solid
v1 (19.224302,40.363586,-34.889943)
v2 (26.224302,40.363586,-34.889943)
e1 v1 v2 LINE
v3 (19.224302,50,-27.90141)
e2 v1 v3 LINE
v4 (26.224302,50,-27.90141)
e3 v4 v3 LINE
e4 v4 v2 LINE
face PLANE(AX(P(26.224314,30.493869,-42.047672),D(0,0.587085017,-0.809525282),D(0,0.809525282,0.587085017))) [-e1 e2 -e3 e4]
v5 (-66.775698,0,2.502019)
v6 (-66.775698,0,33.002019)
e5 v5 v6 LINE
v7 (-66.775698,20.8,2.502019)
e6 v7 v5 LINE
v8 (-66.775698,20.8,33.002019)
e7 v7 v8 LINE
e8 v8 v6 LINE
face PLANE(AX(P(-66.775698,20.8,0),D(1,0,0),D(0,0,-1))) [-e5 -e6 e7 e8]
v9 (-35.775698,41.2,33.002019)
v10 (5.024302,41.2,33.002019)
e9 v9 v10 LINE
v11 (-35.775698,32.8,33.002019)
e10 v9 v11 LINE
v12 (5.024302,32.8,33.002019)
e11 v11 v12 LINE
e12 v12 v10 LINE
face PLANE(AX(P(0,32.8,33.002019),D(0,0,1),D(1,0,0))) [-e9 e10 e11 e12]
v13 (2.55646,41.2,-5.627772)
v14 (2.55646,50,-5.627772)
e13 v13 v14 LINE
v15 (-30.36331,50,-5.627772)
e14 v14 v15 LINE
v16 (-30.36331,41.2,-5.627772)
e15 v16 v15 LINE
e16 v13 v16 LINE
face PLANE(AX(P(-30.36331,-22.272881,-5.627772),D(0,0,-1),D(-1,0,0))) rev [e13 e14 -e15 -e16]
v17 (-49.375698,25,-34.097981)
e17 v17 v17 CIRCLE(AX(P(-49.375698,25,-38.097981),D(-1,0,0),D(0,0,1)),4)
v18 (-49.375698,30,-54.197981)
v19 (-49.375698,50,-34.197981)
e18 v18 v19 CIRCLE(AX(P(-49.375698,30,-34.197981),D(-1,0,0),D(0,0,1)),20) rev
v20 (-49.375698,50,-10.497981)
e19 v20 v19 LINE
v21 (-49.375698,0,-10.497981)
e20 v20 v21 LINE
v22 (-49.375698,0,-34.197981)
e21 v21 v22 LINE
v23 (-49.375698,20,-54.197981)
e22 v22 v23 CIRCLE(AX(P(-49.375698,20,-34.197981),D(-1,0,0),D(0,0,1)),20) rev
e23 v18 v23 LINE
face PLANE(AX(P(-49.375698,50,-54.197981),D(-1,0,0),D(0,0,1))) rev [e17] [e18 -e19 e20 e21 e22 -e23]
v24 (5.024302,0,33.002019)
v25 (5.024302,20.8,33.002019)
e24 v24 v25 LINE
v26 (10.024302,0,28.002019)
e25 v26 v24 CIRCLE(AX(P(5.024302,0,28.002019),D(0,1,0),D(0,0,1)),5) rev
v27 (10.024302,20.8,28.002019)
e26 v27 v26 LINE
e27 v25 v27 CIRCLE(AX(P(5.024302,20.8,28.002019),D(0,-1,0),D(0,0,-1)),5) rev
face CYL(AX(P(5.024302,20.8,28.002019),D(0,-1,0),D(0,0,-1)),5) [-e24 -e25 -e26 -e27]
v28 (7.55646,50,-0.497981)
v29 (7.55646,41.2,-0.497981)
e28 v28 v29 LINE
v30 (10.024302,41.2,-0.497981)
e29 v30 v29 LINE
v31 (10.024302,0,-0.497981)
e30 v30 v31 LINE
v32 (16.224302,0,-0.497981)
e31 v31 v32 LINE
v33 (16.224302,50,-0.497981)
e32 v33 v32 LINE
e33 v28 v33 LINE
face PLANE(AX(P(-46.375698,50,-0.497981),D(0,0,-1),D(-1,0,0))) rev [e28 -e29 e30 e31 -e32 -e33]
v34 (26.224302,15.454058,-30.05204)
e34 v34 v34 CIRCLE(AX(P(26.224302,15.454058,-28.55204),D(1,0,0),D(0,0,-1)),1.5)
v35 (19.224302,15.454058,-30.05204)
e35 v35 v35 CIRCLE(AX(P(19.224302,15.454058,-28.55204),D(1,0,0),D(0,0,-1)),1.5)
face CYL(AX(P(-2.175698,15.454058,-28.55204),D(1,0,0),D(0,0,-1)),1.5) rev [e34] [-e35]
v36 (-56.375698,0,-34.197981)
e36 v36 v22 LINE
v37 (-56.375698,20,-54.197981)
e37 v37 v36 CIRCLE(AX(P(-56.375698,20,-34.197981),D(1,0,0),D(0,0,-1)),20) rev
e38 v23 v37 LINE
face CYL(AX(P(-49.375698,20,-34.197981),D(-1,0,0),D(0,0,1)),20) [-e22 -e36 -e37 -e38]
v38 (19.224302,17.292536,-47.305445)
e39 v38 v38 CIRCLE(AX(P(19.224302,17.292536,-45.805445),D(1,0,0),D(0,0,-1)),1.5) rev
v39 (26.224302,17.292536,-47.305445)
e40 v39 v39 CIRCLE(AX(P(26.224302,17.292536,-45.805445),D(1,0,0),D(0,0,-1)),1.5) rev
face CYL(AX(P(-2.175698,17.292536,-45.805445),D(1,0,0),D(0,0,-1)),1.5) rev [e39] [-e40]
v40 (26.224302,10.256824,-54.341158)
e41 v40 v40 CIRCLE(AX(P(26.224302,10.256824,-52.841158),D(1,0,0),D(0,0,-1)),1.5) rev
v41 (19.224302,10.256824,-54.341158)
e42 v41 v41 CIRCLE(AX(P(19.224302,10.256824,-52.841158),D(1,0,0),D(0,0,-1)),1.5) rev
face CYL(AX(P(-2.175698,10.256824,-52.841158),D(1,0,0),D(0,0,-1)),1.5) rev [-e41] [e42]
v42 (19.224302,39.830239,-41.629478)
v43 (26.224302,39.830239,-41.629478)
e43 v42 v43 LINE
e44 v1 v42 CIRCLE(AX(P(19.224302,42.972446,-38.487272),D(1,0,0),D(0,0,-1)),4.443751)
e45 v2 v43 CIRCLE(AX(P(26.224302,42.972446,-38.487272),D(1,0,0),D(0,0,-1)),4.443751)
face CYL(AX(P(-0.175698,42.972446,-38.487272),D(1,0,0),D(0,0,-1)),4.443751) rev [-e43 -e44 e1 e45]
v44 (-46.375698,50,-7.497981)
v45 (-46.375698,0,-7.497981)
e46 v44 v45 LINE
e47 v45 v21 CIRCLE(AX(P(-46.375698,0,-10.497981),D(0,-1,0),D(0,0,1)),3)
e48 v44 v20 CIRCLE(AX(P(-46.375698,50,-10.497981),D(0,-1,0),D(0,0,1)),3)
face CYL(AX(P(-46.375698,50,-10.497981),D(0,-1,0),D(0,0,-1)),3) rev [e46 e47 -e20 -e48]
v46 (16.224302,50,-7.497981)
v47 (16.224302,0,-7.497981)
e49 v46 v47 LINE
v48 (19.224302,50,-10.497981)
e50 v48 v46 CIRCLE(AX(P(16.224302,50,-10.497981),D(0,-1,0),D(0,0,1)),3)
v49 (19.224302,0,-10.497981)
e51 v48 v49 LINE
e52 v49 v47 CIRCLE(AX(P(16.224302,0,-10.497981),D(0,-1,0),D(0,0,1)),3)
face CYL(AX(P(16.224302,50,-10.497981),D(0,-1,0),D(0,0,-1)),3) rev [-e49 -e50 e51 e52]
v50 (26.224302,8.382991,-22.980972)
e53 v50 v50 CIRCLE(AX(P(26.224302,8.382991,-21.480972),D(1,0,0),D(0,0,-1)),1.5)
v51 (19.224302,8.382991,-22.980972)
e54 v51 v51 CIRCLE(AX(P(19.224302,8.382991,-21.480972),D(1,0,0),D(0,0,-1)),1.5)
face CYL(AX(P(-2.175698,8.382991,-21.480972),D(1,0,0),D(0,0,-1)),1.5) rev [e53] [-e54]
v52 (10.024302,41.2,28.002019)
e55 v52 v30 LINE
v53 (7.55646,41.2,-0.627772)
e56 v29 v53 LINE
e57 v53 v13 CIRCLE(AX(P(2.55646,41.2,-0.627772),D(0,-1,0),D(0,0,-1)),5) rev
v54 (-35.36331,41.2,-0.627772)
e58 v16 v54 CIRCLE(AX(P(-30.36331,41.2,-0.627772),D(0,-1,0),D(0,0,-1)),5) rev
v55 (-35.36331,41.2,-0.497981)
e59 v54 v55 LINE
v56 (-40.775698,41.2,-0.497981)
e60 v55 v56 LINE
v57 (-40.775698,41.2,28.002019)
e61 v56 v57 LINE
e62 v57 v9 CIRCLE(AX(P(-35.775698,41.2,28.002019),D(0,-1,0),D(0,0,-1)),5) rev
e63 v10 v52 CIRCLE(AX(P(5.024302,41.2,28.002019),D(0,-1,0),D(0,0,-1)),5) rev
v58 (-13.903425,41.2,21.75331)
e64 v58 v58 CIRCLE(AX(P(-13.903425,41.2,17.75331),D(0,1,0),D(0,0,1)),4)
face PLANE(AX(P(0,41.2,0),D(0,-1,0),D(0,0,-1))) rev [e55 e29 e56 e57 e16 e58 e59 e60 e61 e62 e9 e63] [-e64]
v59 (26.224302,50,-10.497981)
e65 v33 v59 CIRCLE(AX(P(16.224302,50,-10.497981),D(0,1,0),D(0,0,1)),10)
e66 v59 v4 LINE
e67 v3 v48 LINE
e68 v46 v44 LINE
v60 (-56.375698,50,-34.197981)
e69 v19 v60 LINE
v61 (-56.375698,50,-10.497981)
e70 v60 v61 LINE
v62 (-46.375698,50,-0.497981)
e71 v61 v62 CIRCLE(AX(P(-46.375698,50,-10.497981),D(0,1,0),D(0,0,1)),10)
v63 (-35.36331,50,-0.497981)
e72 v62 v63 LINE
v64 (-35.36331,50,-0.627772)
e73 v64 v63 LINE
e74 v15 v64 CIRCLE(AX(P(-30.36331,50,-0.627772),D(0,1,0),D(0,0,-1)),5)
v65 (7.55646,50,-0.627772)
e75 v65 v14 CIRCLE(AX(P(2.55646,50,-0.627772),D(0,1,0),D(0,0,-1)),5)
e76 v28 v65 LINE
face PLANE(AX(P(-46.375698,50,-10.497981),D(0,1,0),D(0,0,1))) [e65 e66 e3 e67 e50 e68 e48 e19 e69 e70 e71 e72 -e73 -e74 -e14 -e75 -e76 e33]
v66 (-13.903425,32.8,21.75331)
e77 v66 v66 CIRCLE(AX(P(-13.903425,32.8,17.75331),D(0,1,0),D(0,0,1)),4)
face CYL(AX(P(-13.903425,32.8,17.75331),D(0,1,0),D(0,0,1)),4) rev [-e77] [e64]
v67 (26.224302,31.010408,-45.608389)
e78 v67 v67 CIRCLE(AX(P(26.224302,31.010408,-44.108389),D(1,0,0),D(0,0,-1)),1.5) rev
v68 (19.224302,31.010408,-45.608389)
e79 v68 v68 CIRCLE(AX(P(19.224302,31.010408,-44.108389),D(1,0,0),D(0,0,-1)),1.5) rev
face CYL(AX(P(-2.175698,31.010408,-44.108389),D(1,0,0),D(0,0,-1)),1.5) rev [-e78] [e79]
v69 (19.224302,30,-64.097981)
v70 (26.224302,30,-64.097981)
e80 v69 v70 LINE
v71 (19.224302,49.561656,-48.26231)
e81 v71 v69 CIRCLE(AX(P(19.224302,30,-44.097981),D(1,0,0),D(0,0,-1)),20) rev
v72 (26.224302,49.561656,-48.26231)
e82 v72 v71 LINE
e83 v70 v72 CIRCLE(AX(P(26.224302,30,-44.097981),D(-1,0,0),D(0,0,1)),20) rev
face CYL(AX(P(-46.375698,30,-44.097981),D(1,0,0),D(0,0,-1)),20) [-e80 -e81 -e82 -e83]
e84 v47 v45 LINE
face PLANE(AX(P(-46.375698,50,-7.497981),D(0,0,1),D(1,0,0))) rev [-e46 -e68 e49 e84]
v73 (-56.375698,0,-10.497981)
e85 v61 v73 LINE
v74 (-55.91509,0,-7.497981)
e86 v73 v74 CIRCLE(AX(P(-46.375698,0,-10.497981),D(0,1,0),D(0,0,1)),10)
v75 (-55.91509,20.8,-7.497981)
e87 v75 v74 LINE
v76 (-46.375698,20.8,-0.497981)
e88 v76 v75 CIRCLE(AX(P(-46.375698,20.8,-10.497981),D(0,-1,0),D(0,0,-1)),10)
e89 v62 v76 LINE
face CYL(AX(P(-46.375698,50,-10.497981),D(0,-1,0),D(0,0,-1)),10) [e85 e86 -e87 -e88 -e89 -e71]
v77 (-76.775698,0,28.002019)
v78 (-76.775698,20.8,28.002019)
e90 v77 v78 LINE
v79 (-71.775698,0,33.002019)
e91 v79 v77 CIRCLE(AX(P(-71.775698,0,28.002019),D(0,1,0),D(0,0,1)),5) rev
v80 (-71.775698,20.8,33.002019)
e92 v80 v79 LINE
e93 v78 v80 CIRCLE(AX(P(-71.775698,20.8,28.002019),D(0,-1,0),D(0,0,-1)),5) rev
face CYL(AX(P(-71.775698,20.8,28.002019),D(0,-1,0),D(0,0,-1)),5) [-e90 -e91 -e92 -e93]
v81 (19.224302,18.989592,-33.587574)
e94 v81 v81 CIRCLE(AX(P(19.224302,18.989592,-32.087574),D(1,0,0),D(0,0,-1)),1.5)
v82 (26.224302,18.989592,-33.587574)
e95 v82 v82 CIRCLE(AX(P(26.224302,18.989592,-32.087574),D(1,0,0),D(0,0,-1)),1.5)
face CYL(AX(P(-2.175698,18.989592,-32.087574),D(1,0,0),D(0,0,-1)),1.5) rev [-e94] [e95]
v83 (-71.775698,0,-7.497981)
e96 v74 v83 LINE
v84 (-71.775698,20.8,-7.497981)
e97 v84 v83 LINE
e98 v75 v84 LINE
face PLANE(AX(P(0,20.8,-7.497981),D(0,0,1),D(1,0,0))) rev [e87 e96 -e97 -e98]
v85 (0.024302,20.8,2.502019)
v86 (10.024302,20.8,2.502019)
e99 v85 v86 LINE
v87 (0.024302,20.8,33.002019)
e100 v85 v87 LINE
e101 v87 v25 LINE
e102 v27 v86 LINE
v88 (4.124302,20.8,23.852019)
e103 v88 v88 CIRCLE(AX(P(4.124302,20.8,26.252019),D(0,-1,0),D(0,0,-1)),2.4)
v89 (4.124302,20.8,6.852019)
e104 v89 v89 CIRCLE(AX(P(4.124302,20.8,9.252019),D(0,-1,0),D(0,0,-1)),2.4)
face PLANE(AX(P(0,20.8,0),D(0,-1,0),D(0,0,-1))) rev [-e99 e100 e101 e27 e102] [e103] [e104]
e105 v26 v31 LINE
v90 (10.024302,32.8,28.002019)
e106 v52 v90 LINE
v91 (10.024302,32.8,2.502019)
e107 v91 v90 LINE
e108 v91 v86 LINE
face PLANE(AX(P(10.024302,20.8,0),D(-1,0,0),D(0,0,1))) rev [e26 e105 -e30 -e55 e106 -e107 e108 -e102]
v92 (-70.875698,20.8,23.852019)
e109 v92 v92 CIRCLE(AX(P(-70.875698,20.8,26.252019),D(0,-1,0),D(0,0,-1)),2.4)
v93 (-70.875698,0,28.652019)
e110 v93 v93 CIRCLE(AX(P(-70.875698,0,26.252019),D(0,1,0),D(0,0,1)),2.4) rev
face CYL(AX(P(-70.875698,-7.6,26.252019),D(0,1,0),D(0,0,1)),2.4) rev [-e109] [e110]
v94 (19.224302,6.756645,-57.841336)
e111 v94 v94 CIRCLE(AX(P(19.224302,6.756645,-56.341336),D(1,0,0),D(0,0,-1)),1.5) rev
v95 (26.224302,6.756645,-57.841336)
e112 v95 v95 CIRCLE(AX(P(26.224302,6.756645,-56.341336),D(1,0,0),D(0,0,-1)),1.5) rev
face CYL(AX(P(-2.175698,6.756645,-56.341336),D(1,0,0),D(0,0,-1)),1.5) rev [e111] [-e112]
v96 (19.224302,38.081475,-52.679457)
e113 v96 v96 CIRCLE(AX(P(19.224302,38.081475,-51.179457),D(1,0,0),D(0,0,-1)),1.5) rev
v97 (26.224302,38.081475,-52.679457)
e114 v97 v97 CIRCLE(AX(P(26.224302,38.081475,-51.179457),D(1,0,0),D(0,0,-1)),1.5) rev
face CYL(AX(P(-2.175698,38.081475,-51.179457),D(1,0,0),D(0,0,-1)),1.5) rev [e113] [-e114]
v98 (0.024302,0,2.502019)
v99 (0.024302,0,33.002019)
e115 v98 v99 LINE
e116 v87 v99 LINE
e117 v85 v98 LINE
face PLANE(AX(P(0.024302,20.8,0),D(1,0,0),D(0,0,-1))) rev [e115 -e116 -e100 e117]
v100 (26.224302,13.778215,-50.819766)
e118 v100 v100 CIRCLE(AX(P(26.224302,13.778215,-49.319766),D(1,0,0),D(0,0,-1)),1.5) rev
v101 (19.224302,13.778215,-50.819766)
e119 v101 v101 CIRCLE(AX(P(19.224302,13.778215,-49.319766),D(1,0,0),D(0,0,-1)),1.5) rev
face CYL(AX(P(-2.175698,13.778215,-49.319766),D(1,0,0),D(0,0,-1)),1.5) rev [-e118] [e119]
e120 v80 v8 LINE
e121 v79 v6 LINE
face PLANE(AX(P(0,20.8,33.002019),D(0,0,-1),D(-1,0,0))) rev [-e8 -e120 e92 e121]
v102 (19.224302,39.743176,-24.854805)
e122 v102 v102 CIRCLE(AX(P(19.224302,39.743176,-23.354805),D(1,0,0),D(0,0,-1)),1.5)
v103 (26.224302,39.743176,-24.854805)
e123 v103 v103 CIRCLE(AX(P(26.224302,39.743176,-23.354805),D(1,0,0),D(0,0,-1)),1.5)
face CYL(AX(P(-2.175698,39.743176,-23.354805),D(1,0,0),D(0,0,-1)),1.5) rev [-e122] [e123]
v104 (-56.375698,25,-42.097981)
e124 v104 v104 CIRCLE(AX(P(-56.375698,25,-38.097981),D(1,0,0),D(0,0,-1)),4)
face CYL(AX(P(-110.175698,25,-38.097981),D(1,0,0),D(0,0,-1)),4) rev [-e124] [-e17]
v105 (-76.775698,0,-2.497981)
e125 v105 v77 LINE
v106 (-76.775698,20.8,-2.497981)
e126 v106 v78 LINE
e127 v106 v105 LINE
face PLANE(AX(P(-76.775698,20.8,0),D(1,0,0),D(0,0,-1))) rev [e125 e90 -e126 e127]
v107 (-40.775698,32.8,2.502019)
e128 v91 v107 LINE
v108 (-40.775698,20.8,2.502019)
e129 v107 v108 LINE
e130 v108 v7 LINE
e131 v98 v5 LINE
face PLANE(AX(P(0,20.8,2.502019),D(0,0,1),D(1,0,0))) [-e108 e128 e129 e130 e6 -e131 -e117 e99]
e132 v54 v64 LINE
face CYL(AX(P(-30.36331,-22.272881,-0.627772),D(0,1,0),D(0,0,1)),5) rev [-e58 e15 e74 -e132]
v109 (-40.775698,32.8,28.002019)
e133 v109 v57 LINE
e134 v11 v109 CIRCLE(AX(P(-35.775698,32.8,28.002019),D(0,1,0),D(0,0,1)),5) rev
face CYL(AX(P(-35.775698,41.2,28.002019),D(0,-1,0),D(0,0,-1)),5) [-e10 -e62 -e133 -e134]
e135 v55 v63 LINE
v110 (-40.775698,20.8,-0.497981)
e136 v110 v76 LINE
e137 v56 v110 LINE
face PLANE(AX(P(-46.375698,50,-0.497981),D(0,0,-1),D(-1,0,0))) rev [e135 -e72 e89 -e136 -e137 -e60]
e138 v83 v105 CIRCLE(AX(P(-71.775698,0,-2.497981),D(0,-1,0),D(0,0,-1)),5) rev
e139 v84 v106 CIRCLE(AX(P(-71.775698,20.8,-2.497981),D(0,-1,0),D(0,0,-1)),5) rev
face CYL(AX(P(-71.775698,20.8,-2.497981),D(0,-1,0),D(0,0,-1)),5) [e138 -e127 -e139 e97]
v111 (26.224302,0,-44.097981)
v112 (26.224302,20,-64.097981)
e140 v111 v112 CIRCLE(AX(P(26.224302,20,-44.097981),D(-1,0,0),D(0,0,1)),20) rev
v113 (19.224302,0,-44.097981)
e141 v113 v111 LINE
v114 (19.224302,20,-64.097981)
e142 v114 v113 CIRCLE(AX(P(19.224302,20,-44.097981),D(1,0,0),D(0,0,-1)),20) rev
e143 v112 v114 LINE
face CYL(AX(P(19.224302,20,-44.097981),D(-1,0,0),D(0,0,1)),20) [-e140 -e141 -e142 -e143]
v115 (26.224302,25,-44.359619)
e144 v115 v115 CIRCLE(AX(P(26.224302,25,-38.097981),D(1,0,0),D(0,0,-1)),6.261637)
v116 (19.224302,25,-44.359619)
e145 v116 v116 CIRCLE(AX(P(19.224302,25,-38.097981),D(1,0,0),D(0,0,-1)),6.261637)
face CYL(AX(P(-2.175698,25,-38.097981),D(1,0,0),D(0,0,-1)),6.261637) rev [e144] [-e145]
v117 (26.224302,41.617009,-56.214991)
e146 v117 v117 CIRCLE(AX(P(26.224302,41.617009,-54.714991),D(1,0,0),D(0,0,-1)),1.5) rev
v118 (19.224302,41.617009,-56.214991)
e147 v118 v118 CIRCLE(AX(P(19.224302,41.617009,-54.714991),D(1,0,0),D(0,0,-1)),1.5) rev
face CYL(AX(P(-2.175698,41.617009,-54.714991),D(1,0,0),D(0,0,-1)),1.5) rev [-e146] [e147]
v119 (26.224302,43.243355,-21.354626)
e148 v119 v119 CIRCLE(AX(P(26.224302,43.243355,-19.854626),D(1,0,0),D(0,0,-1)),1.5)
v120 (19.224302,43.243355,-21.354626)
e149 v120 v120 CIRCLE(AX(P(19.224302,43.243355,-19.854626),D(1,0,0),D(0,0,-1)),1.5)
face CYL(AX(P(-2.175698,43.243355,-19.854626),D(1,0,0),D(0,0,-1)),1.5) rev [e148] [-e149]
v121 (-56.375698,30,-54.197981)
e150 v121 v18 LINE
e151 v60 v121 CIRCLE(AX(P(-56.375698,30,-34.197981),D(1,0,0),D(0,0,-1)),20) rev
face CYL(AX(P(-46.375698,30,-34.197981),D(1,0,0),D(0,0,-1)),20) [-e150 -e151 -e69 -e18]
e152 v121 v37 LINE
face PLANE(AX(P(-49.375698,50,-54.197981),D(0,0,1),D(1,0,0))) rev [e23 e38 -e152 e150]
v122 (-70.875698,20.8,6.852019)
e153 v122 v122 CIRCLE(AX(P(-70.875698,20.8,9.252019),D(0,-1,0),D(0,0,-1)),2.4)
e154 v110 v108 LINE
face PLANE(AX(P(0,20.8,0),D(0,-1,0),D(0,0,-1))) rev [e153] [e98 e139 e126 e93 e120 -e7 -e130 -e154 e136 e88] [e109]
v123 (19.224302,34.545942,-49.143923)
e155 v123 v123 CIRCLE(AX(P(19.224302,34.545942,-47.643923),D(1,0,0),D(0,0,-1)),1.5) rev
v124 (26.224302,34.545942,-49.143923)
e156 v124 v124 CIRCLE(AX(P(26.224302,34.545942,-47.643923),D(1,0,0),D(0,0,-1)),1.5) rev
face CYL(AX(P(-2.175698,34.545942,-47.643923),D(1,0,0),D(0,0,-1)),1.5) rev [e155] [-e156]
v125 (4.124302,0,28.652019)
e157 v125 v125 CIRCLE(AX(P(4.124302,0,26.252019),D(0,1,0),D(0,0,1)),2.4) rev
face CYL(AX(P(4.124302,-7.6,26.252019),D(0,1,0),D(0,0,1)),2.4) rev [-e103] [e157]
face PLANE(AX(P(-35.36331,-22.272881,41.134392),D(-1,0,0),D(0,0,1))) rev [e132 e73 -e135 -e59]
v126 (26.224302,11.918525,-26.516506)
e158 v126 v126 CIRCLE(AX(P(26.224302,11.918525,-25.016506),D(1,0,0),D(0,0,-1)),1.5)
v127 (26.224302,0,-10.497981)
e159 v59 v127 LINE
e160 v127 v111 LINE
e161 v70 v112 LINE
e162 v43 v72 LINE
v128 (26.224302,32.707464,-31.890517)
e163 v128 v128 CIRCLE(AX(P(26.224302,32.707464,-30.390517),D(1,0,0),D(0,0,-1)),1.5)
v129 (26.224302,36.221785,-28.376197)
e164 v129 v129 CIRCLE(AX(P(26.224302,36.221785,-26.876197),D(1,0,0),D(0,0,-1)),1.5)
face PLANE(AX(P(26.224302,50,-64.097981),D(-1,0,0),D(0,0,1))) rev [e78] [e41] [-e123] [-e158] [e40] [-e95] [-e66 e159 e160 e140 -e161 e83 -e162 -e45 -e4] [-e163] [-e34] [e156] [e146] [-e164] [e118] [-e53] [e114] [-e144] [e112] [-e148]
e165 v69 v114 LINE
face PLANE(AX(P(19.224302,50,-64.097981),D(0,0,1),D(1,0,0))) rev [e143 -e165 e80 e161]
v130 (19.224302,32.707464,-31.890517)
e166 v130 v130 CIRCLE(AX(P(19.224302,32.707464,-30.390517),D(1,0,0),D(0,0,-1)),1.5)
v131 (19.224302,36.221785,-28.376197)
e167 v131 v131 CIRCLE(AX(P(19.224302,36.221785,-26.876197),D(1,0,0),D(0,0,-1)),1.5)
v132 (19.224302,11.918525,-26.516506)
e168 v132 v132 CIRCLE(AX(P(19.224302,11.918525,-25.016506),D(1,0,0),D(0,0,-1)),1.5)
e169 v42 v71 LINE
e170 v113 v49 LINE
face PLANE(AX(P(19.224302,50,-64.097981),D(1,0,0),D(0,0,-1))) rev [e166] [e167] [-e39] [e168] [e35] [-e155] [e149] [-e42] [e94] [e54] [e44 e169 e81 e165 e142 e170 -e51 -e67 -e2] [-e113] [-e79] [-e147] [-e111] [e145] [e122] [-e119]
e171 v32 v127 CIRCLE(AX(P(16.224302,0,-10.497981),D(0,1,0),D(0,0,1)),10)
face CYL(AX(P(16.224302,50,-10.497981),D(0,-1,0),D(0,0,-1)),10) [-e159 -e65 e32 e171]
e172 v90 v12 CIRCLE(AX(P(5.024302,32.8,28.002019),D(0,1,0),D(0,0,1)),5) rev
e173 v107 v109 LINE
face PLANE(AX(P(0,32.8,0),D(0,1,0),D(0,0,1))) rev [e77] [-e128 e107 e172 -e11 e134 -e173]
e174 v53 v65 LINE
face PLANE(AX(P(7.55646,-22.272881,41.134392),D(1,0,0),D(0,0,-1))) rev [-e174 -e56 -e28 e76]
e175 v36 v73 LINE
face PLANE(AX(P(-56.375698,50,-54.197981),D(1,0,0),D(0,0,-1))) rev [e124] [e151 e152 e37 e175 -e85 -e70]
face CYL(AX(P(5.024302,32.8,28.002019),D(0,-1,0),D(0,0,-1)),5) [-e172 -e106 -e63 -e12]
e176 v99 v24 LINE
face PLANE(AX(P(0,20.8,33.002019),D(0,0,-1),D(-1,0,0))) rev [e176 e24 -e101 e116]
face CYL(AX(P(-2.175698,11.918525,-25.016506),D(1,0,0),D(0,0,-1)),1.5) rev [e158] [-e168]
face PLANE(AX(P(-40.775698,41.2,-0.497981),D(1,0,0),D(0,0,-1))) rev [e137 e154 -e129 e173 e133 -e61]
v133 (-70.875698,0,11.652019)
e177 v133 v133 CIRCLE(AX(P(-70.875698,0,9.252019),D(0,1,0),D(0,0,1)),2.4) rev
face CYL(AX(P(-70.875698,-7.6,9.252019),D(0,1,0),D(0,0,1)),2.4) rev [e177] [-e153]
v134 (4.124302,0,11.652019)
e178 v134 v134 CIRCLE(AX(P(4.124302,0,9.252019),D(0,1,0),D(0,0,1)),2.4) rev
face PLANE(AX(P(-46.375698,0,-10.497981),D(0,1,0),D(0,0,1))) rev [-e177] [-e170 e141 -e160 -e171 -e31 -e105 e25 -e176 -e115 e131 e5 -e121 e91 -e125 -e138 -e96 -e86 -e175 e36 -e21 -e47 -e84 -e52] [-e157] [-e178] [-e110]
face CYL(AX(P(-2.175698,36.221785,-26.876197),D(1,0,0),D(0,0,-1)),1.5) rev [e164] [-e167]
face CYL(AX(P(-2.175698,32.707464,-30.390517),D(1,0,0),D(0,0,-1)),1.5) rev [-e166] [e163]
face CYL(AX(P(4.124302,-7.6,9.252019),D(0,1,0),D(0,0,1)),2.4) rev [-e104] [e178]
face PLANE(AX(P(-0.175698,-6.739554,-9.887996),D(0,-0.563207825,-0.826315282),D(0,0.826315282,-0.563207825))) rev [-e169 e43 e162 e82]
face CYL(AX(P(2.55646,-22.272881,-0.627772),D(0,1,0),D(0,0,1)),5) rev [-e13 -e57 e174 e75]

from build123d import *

# Parameters (mm, degrees)
BOSS_EXTRUDE1_DEPTH     = 50
BOSS_EXTRUDE2_DEPTH     = 20.8
SKETCH4_W               = 50.8
SKETCH4_H               = 3
BOSS_EXTRUDE3_DEPTH     = 20.4
BOSS_EXTRUDE4_START     = 32.8
BOSS_EXTRUDE4_OUTLINE_W = 50.8
BOSS_EXTRUDE4_OUTLINE_H = 30.5
BOSS_EXTRUDE4_OUTLINE_R = 4
BOSS_EXTRUDE4_DEPTH     = 8.4
CUT_EXTRUDE1_OUTLINE_R  = 2.4
CUT_EXTRUDE1_DEPTH      = 20.8
FILLET1_R               = 5
FILLET2_R               = 20
SKETCH6_R               = 1.5
CUT_EXTRUDE2_DEPTH      = 28.4
CUT_EXTRUDE3_DEPTH      = 136.4
CUT_EXTRUDE4_DEPTH      = 132.215666798
CUT_EXTRUDE4_DEPTH_BACK = 26.4
CUT_EXTRUDE5_DEPTH      = 8.8


# Read off the part's stored shape, not the designer's step: Boss-Extrude4, Cut-Extrude1
with BuildPart() as part:
    # Sketch1 → Boss-Extrude1 (new body)
    with BuildSketch(Plane(origin=(0, 0, 0), x_dir=(1, 0, 0), z_dir=(0, 1, 0))):
        with BuildLine():
            Line((-56.375697839, 54.197981352), (-56.375697839, 10.497981352))
            ThreePointArc((-56.375697839, 10.497981352), (-53.44676565, 3.42691354), (-46.375697839, 0.497981352))
            Line((-46.375697839, 0.497981352), (16.224302161, 0.497981352))
            ThreePointArc((16.224302161, 0.497981352), (23.295369973, 3.42691354), (26.224302161, 10.497981352))
            Line((26.224302161, 10.497981352), (26.224302161, 64.097981352))
            Line((26.224302161, 64.097981352), (19.224302161, 64.097981352))
            Line((19.224302161, 64.097981352), (19.224302161, 10.497981352))
            ThreePointArc((19.224302161, 10.497981352), (18.345622505, 8.376661008), (16.224302161, 7.497981352))
            Line((16.224302161, 7.497981352), (-46.375697839, 7.497981352))
            ThreePointArc((-46.375697839, 7.497981352), (-48.497018182, 8.376661008), (-49.375697839, 10.497981352))
            Line((-49.375697839, 10.497981352), (-49.375697839, 54.197981352))
            Line((-49.375697839, 54.197981352), (-56.375697839, 54.197981352))
        make_face()
    extrude(amount=BOSS_EXTRUDE1_DEPTH)

    # Sketch2 → Boss-Extrude2 (add)
    with BuildSketch(Plane.XZ):
        with BuildLine():
            Line((-71.775697839, -7.497981352), (-55.915089853, -7.497981352))
            ThreePointArc((-55.915089853, -7.497981352), (-52.291777622, -2.435723603), (-46.375697839, -0.497981352))
            Line((-46.375697839, -0.497981352), (10.024302161, -0.497981352))
            Line((10.024302161, -0.497981352), (10.024302161, 33.002018648))
            Line((10.024302161, 33.002018648), (0.024302161, 33.002018648))
            Line((0.024302161, 33.002018648), (0.024302161, 2.502018648))
            Line((0.024302161, 2.502018648), (-66.775697839, 2.502018648))
            Line((-66.775697839, 2.502018648), (-66.775697839, 33.002018648))
            Line((-66.775697839, 33.002018648), (-76.775697839, 33.002018648))
            Line((-76.775697839, 33.002018648), (-76.775697839, -2.497981352))
            ThreePointArc((-76.775697839, -2.497981352), (-75.311231744, -6.033515257), (-71.775697839, -7.497981352))
        make_face()
    extrude(amount=-BOSS_EXTRUDE2_DEPTH)

    # Sketch4 → Boss-Extrude3 (add)
    with BuildSketch(Plane(origin=(0, 20.8, 0), x_dir=(1, 0, 0), z_dir=(0, 1, 0))):
        with Locations((-15.375697839, -1.002018648)):
            Rectangle(SKETCH4_W, SKETCH4_H)
    extrude(amount=BOSS_EXTRUDE3_DEPTH)

    # Boss-Extrude4 outline → Boss-Extrude4 (add)
    with BuildSketch(Plane(origin=(0, 0, 0), x_dir=(1, 0, 0), z_dir=(0, 1, 0)).offset(BOSS_EXTRUDE4_START)):
        with Locations((-15.375697839, -17.752018648)):
            Rectangle(BOSS_EXTRUDE4_OUTLINE_W, BOSS_EXTRUDE4_OUTLINE_H)
        with Locations((-13.903425018, -17.753309847)):
            Circle(BOSS_EXTRUDE4_OUTLINE_R, mode=Mode.SUBTRACT)
    extrude(amount=BOSS_EXTRUDE4_DEPTH)

    # Cut-Extrude1 outline → Cut-Extrude1 (cut)
    with BuildSketch(Plane(origin=(0, 0, 0), x_dir=(1, 0, 0), z_dir=(0, 1, 0))):
        with Locations((-70.875697839, -9.252018648)):
            Circle(CUT_EXTRUDE1_OUTLINE_R)
        with Locations((-70.875697839, -26.252018648)):
            Circle(CUT_EXTRUDE1_OUTLINE_R)
        with Locations((4.124302161, -26.252018648)):
            Circle(CUT_EXTRUDE1_OUTLINE_R)
        with Locations((4.124302161, -9.252018648)):
            Circle(CUT_EXTRUDE1_OUTLINE_R)
    extrude(amount=CUT_EXTRUDE1_DEPTH, mode=Mode.SUBTRACT)

    # Fillet1
    fillet1_edges = [part.edges().sort_by_distance(p)[0] for p in [
        (-76.775697839, 10.4, 33.002018648),
        (10.024302161, 10.4, 33.002018648),
        (10.024302161, 37, 33.002018648),
        (-40.775697839, 37, 33.002018648),
    ]]
    fillet(fillet1_edges, radius=FILLET1_R)

    # Fillet2
    fillet2_edges = [part.edges().sort_by_distance(p)[0] for p in [
        (22.724302161, 0, -64.097981352),
        (-52.875697839, 0, -54.197981352),
        (22.724302161, 50, -64.097981352),
        (-52.875697839, 50, -54.197981352),
    ]]
    fillet(fillet2_edges, radius=FILLET2_R)

    # Sketch6 → Cut-Extrude2 (cut)
    with BuildSketch(Plane(origin=(26.224302161, 0, 0), x_dir=(0, 0, -1), z_dir=(1, 0, 0))):
        with BuildLine():
            ThreePointArc((34.097981352, 25), (38.097981352, 21), (42.097981352, 25))
            Line((42.097981352, 25), (34.097981352, 25))
        make_face()
        with BuildLine():
            Line((34.097981352, 25), (42.097981352, 25))
            ThreePointArc((42.097981352, 25), (38.097981352, 29), (34.097981352, 25))
        make_face()
        with BuildLine():
            ThreePointArc((31.836343923, 25), (38.097981352, 18.738362572), (44.35961878, 25))
            Line((44.35961878, 25), (42.097981352, 25))
            ThreePointArc((42.097981352, 25), (38.097981352, 21), (34.097981352, 25))
            Line((34.097981352, 25), (31.836343923, 25))
        make_face()
        with BuildLine():
            Line((42.097981352, 25), (44.35961878, 25))
            ThreePointArc((44.35961878, 25), (38.097981352, 31.261637428), (31.836343923, 25))
            Line((31.836343923, 25), (34.097981352, 25))
            ThreePointArc((34.097981352, 25), (38.097981352, 29), (42.097981352, 25))
        make_face()
        with Locations((30.390517437, 32.707463915)):
            Circle(SKETCH6_R)
        with Locations((26.876196734, 36.221784617)):
            Circle(SKETCH6_R)
        with Locations((23.354804964, 39.743176388)):
            Circle(SKETCH6_R)
        with Locations((19.854626397, 43.243354955)):
            Circle(SKETCH6_R)
        with Locations((44.108388992, 31.01040764)):
            Circle(SKETCH6_R)
        with Locations((47.643922898, 34.545941546)):
            Circle(SKETCH6_R)
        with Locations((51.179456803, 38.081475452)):
            Circle(SKETCH6_R)
        with Locations((54.714990709, 41.617009358)):
            Circle(SKETCH6_R)
        with Locations((45.805445266, 17.292536085)):
            Circle(SKETCH6_R)
        with Locations((49.319765969, 13.778215383)):
            Circle(SKETCH6_R)
        with Locations((52.841157739, 10.256823612)):
            Circle(SKETCH6_R)
        with Locations((56.341336306, 6.756645045)):
            Circle(SKETCH6_R)
        with Locations((32.087573711, 18.98959236)):
            Circle(SKETCH6_R)
        with Locations((28.552039805, 15.454058454)):
            Circle(SKETCH6_R)
        with Locations((25.0165059, 11.918524548)):
            Circle(SKETCH6_R)
        with Locations((21.480971994, 8.382990642)):
            Circle(SKETCH6_R)
    extrude(amount=-CUT_EXTRUDE2_DEPTH, mode=Mode.SUBTRACT)

    # Sketch6<3> → Cut-Extrude3 (cut)
    with BuildSketch(Plane(origin=(26.224302161, 0, 0), x_dir=(0, 0, -1), z_dir=(1, 0, 0))):
        with BuildLine():
            ThreePointArc((34.097981352, 25), (38.097981352, 21), (42.097981352, 25))
            Line((42.097981352, 25), (34.097981352, 25))
        make_face()
        with BuildLine():
            Line((34.097981352, 25), (42.097981352, 25))
            ThreePointArc((42.097981352, 25), (38.097981352, 29), (34.097981352, 25))
        make_face()
    extrude(amount=-CUT_EXTRUDE3_DEPTH, mode=Mode.SUBTRACT)

    # Sketch7 → Cut-Extrude4 (cut, two sides: drawn at the far end of the back side and taken through both)
    with BuildSketch(Plane(origin=(26.224302161, 0, 0), x_dir=(0, 0, -1), z_dir=(1, 0, 0)).offset(-CUT_EXTRUDE4_DEPTH_BACK)):
        with BuildLine():
            Line((44.097981352, 50), (27.901409821, 50))
            Line((27.901409821, 50), (34.889942889, 40.363586132))
            ThreePointArc((34.889942889, 40.363586132), (38.136702541, 38.542544558), (41.629478365, 39.830239282))
            Line((41.629478365, 39.830239282), (48.26230961, 49.561655609))
            ThreePointArc((48.26230961, 49.561655609), (46.191648926, 49.890112018), (44.097981352, 50))
        make_face()
    extrude(amount=CUT_EXTRUDE4_DEPTH + CUT_EXTRUDE4_DEPTH_BACK, mode=Mode.SUBTRACT)

    # Sketch8 → Cut-Extrude5 (cut)
    with BuildSketch(Plane(origin=(0, 50, 0), x_dir=(1, 0, 0), z_dir=(0, 1, 0))):
        with BuildLine():
            Line((-35.363310125, -41.134391508), (7.556460089, -41.134391508))
            Line((7.556460089, -41.134391508), (7.556460089, 0.627771813))
            ThreePointArc((7.556460089, 0.627771813), (6.091993995, 4.163305719), (2.556460089, 5.627771813))
            Line((2.556460089, 5.627771813), (-30.363310125, 5.627771813))
            ThreePointArc((-30.363310125, 5.627771813), (-33.898844031, 4.163305719), (-35.363310125, 0.627771813))
            Line((-35.363310125, 0.627771813), (-35.363310125, -41.134391508))
        make_face()
    extrude(amount=-CUT_EXTRUDE5_DEPTH, mode=Mode.SUBTRACT)


solid = part.part
